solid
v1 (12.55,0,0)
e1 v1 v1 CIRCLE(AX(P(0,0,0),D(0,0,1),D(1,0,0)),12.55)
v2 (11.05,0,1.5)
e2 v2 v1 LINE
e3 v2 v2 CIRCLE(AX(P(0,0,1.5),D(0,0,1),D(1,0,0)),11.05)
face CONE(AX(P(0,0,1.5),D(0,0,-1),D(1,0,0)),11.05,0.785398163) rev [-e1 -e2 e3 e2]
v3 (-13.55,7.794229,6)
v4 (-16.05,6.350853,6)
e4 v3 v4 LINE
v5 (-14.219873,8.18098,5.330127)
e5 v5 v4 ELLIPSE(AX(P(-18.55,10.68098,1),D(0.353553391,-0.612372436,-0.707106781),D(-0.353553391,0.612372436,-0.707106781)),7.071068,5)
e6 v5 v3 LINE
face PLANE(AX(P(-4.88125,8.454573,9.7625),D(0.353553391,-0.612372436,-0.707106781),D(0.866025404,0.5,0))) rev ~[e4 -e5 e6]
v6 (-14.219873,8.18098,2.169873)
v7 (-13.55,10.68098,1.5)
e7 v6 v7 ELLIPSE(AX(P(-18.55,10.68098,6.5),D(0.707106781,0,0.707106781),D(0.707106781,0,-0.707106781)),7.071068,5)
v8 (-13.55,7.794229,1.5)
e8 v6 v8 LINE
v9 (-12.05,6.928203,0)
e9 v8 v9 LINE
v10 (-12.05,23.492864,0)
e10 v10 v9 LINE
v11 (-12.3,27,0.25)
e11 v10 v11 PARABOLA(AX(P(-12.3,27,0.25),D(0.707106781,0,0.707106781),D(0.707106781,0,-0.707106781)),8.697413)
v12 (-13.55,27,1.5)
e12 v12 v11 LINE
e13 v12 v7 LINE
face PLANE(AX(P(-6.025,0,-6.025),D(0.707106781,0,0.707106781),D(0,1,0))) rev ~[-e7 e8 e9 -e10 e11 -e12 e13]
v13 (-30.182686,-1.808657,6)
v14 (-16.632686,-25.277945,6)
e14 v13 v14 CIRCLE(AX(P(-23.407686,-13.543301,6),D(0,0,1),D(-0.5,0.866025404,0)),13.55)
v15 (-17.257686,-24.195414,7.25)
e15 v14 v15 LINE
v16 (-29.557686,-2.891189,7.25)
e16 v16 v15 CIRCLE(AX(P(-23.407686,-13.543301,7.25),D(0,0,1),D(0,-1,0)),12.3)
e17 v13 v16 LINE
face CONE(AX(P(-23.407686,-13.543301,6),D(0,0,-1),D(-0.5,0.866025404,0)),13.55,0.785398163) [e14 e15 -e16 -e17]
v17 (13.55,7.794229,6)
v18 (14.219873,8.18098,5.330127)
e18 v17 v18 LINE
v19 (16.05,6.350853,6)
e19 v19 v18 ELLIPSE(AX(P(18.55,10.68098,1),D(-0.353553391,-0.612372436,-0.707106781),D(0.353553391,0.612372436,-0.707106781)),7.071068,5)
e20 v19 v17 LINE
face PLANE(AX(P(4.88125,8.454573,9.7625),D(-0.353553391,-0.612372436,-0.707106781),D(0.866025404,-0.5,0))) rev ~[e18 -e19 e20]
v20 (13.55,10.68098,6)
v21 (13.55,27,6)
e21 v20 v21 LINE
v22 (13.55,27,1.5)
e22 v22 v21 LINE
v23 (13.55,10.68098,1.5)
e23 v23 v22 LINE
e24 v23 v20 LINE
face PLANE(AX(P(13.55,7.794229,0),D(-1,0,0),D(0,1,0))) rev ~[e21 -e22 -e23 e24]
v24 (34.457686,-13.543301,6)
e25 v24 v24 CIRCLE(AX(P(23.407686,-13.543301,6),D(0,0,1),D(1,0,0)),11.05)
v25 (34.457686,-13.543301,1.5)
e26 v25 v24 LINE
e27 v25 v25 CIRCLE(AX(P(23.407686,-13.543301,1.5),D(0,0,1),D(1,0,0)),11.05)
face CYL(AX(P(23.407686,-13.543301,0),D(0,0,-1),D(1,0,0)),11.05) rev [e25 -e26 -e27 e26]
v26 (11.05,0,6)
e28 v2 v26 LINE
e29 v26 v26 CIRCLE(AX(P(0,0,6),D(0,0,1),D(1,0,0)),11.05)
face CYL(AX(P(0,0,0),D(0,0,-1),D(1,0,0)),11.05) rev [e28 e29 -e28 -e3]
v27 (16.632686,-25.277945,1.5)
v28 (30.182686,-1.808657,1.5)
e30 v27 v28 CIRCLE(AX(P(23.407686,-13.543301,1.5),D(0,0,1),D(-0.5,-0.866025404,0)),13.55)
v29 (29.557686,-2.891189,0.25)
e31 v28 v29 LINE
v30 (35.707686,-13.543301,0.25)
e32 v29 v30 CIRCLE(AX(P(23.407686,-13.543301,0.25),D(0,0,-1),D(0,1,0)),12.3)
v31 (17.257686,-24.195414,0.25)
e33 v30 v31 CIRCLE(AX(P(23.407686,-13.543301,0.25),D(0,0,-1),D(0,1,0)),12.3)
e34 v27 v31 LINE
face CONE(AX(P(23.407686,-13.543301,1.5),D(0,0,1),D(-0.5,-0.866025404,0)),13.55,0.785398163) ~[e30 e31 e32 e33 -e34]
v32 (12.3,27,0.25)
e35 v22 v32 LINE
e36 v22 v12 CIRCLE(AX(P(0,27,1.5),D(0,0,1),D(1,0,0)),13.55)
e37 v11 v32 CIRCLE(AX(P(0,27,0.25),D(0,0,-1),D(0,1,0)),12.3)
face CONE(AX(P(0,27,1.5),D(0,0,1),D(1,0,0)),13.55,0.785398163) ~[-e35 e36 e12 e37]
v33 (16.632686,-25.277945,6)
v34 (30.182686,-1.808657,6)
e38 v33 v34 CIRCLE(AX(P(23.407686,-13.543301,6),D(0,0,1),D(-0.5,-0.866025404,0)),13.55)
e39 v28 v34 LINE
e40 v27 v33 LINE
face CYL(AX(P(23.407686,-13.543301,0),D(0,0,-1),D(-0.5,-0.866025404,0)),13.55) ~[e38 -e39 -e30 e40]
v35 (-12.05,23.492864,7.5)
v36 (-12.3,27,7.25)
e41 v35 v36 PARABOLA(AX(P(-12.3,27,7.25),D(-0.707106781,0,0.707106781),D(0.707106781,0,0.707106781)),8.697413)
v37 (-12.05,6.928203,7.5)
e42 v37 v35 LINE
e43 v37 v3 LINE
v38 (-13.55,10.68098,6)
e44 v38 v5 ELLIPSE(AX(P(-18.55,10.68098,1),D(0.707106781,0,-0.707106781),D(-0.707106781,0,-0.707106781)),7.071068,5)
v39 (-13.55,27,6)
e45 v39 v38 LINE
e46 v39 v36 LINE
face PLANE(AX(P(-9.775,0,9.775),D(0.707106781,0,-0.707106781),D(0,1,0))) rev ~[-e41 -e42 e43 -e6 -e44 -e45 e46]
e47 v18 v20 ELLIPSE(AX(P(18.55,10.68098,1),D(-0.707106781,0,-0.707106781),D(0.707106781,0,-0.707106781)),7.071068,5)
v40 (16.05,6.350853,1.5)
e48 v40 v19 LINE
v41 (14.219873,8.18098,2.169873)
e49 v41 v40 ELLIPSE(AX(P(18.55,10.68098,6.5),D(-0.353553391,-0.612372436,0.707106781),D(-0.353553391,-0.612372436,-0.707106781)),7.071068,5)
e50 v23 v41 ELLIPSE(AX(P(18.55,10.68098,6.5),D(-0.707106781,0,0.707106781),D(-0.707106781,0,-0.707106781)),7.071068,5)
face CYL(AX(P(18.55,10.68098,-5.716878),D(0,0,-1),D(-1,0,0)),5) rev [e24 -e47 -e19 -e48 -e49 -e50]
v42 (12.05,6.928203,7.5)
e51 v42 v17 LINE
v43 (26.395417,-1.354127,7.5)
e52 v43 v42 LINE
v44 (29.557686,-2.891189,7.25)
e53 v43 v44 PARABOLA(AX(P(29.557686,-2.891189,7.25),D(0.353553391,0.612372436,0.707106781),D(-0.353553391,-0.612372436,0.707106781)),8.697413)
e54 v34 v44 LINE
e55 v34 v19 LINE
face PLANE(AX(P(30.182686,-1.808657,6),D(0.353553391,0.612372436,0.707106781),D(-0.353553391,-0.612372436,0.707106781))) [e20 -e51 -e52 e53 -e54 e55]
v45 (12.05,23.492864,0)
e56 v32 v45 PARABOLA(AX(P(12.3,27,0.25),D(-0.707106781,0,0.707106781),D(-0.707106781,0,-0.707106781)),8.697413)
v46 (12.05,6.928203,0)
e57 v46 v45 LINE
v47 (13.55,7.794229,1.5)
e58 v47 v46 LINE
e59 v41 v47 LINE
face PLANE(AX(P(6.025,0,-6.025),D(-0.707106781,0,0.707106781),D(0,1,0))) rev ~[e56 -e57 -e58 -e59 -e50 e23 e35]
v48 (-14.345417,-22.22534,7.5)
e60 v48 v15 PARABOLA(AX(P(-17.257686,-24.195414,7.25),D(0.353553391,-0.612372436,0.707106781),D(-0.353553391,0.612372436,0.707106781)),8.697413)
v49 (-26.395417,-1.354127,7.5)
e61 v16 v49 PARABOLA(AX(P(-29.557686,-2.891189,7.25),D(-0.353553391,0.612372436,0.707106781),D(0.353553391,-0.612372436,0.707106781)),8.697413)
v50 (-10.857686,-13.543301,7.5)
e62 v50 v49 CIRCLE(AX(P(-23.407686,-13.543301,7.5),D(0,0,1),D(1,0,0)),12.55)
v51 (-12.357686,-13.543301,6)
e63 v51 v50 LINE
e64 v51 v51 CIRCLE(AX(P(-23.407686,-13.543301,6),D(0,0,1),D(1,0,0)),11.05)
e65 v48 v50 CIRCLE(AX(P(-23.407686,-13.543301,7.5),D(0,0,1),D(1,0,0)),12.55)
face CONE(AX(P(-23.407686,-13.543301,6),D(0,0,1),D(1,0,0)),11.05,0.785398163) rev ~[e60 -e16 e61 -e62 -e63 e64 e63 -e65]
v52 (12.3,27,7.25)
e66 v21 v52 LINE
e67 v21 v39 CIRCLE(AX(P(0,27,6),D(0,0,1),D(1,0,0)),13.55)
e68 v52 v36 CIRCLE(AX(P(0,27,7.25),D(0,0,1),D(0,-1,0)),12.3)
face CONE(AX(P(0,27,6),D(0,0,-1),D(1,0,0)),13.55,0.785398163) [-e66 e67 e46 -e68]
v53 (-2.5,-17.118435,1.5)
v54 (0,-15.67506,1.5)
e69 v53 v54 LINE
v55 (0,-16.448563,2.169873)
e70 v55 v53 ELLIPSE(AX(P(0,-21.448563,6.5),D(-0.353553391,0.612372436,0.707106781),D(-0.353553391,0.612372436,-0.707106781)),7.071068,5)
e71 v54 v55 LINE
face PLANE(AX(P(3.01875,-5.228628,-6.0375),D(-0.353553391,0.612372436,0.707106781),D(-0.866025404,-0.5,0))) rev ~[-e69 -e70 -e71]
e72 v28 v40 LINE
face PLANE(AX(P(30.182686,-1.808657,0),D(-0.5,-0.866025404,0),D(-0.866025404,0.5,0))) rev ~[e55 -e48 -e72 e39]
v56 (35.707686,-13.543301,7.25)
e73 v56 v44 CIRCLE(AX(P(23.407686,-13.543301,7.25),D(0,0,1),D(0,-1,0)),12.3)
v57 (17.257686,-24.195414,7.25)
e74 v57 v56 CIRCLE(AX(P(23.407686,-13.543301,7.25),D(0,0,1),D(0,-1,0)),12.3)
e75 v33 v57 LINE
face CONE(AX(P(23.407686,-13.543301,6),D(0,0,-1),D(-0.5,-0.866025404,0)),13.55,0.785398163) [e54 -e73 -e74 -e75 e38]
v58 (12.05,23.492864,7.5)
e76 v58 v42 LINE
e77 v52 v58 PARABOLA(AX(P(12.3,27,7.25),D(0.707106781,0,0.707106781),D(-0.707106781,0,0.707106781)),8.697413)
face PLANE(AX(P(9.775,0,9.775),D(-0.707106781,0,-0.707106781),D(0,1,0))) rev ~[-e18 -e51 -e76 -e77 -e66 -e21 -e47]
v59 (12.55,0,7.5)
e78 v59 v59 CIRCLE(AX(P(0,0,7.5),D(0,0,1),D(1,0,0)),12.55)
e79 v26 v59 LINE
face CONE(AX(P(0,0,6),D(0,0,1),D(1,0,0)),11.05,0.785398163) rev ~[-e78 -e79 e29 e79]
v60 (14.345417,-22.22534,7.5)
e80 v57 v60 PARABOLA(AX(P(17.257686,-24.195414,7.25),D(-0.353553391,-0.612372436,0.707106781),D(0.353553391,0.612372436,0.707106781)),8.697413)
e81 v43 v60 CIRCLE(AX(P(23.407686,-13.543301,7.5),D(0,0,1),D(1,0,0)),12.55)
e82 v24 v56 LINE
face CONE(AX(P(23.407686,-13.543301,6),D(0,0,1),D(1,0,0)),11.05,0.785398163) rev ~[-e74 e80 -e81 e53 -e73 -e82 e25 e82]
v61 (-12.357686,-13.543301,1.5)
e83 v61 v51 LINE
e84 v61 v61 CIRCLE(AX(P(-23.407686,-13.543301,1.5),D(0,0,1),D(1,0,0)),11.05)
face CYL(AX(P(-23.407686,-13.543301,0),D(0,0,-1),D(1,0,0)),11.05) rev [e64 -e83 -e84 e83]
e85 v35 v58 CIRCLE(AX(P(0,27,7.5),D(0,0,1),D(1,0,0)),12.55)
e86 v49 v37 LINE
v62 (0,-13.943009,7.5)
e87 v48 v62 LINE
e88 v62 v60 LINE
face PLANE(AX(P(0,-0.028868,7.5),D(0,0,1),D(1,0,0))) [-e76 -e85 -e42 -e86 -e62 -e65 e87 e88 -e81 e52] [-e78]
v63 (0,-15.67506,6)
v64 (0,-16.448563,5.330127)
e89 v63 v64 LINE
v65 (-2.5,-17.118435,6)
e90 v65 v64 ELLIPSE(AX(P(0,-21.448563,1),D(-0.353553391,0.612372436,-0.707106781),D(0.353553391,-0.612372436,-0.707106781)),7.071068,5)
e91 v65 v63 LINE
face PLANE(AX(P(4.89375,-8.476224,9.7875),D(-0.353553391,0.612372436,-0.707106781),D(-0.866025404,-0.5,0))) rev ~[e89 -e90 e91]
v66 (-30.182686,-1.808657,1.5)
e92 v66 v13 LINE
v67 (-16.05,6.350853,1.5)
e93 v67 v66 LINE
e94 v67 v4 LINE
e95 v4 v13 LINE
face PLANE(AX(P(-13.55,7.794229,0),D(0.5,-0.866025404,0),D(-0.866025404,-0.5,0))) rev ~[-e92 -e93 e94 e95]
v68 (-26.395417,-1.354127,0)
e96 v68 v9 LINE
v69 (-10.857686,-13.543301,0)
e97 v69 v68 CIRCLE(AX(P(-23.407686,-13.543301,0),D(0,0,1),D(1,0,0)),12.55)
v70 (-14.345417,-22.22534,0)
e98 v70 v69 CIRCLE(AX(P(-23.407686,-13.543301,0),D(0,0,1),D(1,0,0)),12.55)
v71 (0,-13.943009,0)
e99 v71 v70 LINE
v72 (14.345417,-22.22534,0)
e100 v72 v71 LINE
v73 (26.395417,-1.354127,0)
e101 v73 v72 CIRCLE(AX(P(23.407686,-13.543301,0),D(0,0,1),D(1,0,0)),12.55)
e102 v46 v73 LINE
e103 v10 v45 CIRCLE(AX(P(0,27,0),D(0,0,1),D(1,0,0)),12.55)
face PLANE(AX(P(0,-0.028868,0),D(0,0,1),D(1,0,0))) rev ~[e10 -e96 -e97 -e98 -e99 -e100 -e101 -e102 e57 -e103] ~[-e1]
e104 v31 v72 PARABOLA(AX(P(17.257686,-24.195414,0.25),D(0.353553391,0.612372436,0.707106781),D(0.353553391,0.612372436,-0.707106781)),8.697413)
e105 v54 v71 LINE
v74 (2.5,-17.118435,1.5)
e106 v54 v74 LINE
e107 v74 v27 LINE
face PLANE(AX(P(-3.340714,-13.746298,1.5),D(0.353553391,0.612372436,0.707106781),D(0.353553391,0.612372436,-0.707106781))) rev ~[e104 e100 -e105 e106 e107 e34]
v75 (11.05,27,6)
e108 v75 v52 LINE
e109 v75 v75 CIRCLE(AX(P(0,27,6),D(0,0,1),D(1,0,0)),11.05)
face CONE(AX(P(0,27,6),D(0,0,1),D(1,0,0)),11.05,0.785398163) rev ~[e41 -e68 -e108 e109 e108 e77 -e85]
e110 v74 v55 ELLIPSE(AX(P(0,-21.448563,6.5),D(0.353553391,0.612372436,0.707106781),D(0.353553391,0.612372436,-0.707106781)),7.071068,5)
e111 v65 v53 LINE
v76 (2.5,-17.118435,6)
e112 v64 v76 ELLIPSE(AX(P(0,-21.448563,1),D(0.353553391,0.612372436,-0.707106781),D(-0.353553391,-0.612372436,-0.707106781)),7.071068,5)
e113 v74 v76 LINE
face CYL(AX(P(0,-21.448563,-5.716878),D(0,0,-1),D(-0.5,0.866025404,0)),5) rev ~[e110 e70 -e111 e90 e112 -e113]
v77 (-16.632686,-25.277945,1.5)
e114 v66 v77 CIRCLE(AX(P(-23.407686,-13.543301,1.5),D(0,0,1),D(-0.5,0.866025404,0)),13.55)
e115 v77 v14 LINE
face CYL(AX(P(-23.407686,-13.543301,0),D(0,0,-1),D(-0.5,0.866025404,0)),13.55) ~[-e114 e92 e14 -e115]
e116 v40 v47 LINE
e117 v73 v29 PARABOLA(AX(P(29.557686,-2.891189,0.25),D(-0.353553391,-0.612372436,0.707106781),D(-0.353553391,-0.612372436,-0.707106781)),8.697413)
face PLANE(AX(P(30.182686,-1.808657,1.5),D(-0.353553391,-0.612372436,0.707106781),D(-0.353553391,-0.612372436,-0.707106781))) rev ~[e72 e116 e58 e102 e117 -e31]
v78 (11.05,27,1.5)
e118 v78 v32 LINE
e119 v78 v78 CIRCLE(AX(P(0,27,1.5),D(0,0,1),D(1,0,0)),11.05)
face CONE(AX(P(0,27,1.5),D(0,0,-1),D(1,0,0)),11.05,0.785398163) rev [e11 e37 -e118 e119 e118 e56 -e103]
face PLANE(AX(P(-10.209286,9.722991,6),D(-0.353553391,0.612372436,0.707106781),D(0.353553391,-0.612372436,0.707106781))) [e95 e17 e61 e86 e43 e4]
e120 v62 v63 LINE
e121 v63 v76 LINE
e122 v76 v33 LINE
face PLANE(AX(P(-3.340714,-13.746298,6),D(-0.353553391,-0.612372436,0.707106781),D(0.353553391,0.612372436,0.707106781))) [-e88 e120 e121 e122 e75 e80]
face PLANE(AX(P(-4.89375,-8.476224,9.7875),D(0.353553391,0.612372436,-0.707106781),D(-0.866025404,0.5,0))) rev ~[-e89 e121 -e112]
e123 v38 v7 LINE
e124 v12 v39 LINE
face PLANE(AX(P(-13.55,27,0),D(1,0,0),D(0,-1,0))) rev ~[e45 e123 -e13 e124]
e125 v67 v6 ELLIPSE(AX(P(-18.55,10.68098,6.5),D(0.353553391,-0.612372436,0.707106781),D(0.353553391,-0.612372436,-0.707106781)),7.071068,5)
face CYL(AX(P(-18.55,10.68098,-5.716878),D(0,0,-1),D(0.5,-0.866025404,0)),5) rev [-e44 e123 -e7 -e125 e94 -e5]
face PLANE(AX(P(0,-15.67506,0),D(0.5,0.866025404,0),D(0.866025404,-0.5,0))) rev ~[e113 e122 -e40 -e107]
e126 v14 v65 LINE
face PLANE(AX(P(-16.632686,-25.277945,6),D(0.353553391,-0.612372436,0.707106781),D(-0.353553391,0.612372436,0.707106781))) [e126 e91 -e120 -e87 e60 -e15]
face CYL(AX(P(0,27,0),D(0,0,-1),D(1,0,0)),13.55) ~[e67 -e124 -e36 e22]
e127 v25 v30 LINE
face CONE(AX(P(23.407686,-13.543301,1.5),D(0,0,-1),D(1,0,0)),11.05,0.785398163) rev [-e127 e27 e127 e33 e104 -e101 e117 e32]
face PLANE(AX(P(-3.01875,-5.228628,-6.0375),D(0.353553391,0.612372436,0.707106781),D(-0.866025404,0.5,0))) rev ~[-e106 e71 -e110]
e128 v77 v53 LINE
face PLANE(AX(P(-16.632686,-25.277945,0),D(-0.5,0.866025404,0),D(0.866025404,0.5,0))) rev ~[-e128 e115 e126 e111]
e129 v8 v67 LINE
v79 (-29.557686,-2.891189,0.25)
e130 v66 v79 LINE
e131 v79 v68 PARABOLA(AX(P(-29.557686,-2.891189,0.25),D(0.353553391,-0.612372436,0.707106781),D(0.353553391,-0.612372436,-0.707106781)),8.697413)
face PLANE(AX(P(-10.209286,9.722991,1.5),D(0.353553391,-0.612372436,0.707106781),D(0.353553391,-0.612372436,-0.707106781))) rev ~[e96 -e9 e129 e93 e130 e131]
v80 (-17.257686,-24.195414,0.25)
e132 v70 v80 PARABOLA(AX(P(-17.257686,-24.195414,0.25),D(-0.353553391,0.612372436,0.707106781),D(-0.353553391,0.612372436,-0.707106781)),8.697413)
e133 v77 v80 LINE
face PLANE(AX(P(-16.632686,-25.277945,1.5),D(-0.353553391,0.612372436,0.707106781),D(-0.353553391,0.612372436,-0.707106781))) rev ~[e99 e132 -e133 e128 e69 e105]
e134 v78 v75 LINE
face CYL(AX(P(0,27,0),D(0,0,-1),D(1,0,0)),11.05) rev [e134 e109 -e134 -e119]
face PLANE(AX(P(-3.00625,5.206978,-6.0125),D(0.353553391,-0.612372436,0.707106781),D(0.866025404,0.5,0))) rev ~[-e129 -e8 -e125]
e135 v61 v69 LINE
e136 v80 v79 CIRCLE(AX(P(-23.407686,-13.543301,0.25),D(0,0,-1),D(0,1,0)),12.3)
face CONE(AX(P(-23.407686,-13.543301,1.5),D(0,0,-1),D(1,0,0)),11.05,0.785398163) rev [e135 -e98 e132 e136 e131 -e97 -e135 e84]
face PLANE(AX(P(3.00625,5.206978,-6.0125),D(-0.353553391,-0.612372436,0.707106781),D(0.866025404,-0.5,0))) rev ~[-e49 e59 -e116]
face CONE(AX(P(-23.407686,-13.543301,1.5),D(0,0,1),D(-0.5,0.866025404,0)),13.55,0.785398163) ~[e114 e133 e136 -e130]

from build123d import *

# Parameters (mm, degrees)
F0_R          = 11.05
F1_DEPTH      = 7.5
F2_T4_DEPTH   = 23.0632958479
F2_T9_DEPTH   = 23.0632958479
F2_T14_DEPTH  = 23.0632958479
F2_T27_DEPTH  = 23.0632958479
F2_T32_DEPTH  = 23.0632958479
F2_T37_DEPTH  = 23.0632958479
F2_T50_DEPTH  = 23.0632958479
F2_T55_DEPTH  = 23.0632958479
F2_T60_DEPTH  = 23.0632958479
F2_T65_DEPTH  = 23.0632958479
F2_T70_DEPTH  = 23.0632958479
F2_T75_DEPTH  = 23.0632958479
F2_T78_ANGLE  = 180
F2_T80_ANGLE  = 180
F2_T82_ANGLE  = 180
F2_T84_ANGLE  = 180
F2_T86_ANGLE  = 180
F2_T88_ANGLE  = 180
F2_T93_DEPTH  = 23.0632958479
F2_T97_DEPTH  = 23.0632958479
F2_T104_DEPTH = 23.0632958479
F2_T108_DEPTH = 23.0632958479
F2_T115_DEPTH = 23.0632958479
F2_T119_DEPTH = 23.0632958479
F2_T126_DEPTH = 23.0632958479
F2_T130_DEPTH = 23.0632958479
F2_T137_DEPTH = 23.0632958479
F2_T141_DEPTH = 23.0632958479
F2_T148_DEPTH = 23.0632958479
F2_T152_DEPTH = 23.0632958479
F3_T4_DEPTH   = 18.9337567297
F3_T10_DEPTH  = 18.9337567297
F3_T16_DEPTH  = 18.9337567297
F3_T22_DEPTH  = 18.9337567297
F3_T28_DEPTH  = 18.9337567297
F3_T34_DEPTH  = 18.9337567297
F3_T40_DEPTH  = 18.9337567297
F3_T46_DEPTH  = 18.9337567297
F3_T52_DEPTH  = 18.9337567297
F3_T58_DEPTH  = 18.9337567297


# Not quite as in the source:
# - a fillet or chamfer that OpenCascade refuses, or shapes differently, is made with other operations: its cross-section is extruded or revolved along the edge and cut away or added


with BuildPart() as f1:
    # F0 (on Top) → F1 (new body)
    with BuildSketch(Plane.XY):
        with BuildLine():
            ThreePointArc((13.55, 27), (0, 40.55), (-13.55, 27))
            Line((-13.55, 27), (-13.55, 7.7942286341))
            Line((-13.55, 7.7942286341), (-30.1826859022, -1.8086570489))
            ThreePointArc((-30.1826859022, -1.8086570489), (-35.1423301235, -20.3183012702), (-16.6326859022, -25.2779454915))
            Line((-16.6326859022, -25.2779454915), (0, -15.6750598085))
            Line((0, -15.6750598085), (16.6326859022, -25.2779454915))
            ThreePointArc((16.6326859022, -25.2779454915), (35.1423301235, -20.3183012702), (30.1826859022, -1.8086570489))
            Line((30.1826859022, -1.8086570489), (13.55, 7.7942286341))
            Line((13.55, 7.7942286341), (13.55, 27))
        make_face()
        with Locations((-23.4076859022, -13.5433012702)):
            Circle(F0_R, mode=Mode.SUBTRACT)
        with Locations((23.4076859022, -13.5433012702)):
            Circle(F0_R, mode=Mode.SUBTRACT)
        Circle(F0_R, mode=Mode.SUBTRACT)
        with Locations((0, 27)):
            Circle(F0_R, mode=Mode.SUBTRACT)
    extrude(amount=F1_DEPTH)

    # F2: chamfer of 1.5 on 20 edges, made by hand


with BuildPart() as f2_tool2:
    # F2_s3 → F2_t4 (new body)
    with BuildSketch(Plane(origin=(-23.4201859022, -13.5216506351, 0), x_dir=(0, 0, 1), z_dir=(0.8660254038, 0.5, 0))):
        Polygon((6, 13.575), (7.5, 12.075), (7.5, 13.575), align=None)
    extrude(amount=F2_T4_DEPTH)

    split(bisect_by=Plane(origin=(-6.7875, -11.7562948564, 0), x_dir=(0, 0, 1), z_dir=(-0.5, -0.8660254038, 0)), keep=Keep.TOP)


with BuildPart() as f1_1:
    add(f1.part)

    # F2_t1: cut F2_tool2
    add(f2_tool2.part, mode=Mode.SUBTRACT)


with BuildPart() as f2_tool7:
    # F2_s8 → F2_t9 (new body)
    with BuildSketch(Plane.XZ.offset(-27)):
        Polygon((-13.55, 6), (-12.05, 7.5), (-13.55, 7.5), align=None)
    extrude(amount=F2_T9_DEPTH)

    split(bisect_by=Plane(origin=(-6.7625, 11.7129935862, 0), x_dir=(0, 0, 1), z_dir=(-0.5, 0.8660254038, 0)), keep=Keep.TOP)


with BuildPart() as f1_2:
    add(f1_1.part)

    # F2_t6: cut F2_tool7
    add(f2_tool7.part, mode=Mode.SUBTRACT)


with BuildPart() as f2_tool12:
    # F2_s13 → F2_t14 (new body)
    with BuildSketch(Plane(origin=(3.4467858029, -1.9900027112, 0), x_dir=(0, 0, 1), z_dir=(0.8660254038, -0.5, 0))):
        Polygon((6, 13.575), (7.5, 12.075), (7.5, 13.575), align=None)
    extrude(amount=F2_T14_DEPTH)

    split(bisect_by=Plane(origin=(6.7875, -11.7562948564, 0), x_dir=(0, 0, 1), z_dir=(0.5, -0.8660254038, 0)), keep=Keep.TOP)


with BuildPart() as f1_3:
    add(f1_2.part)

    # F2_t11: cut F2_tool12
    add(f2_tool12.part, mode=Mode.SUBTRACT)

    # F2_s16 → F2_t17 (revolve, cut)
    with BuildSketch(Plane.XZ.offset(13.5433012702)):
        Polygon((-12.3576859022, 6), (-10.8576859022, 7.5), (-12.3576859022, 7.5), align=None)
    revolve(axis=Axis((-23.4076859022, -13.5433012702, 7.5), (0, 0, 1)), mode=Mode.SUBTRACT)

    # F2_s18 → F2_t19 (revolve, cut)
    with BuildSketch(Plane.XZ):
        Polygon((11.05, 6), (12.55, 7.5), (11.05, 7.5), align=None)
    revolve(axis=Axis((0, 0, 7.5), (0, 0, 1)), mode=Mode.SUBTRACT)

    # F2_s20 → F2_t21 (revolve, cut)
    with BuildSketch(Plane.XZ.offset(-27)):
        Polygon((11.05, 6), (12.55, 7.5), (11.05, 7.5), align=None)
    revolve(axis=Axis((0, 27, 7.5), (0, 0, 1)), mode=Mode.SUBTRACT)

    # F2_s22 → F2_t23 (revolve, cut)
    with BuildSketch(Plane.XZ.offset(13.5433012702)):
        Polygon((34.4576859022, 6), (35.9576859022, 7.5), (34.4576859022, 7.5), align=None)
    revolve(axis=Axis((23.4076859022, -13.5433012702, 7.5), (0, 0, 1)), mode=Mode.SUBTRACT)


with BuildPart() as f2_tool25:
    # F2_s26 → F2_t27 (new body)
    with BuildSketch(Plane.XZ.offset(-27)):
        Polygon((-13.55, 1.5), (-12.05, 0), (-13.55, 0), align=None)
    extrude(amount=F2_T27_DEPTH)

    split(bisect_by=Plane(origin=(-6.7625, 11.7129935862, 0), x_dir=(0, 0, 1), z_dir=(-0.5, 0.8660254038, 0)), keep=Keep.TOP)


with BuildPart() as f1_4:
    add(f1_3.part)

    # F2_t24: cut F2_tool25
    add(f2_tool25.part, mode=Mode.SUBTRACT)


with BuildPart() as f2_tool30:
    # F2_s31 → F2_t32 (new body)
    with BuildSketch(Plane(origin=(-3.4467858029, -1.9900027112, 0), x_dir=(0, 0, 1), z_dir=(-0.8660254038, -0.5, 0))):
        Polygon((1.5, 13.525), (0, 12.025), (0, 13.525), align=None)
    extrude(amount=F2_T32_DEPTH)

    split(bisect_by=Plane.YZ.offset(-13.55), keep=Keep.BOTTOM)


with BuildPart() as f1_5:
    add(f1_4.part)

    # F2_t29: cut F2_tool30
    add(f2_tool30.part, mode=Mode.SUBTRACT)


with BuildPart() as f2_tool35:
    # F2_s36 → F2_t37 (new body)
    with BuildSketch(Plane(origin=(3.4467858029, -1.9900027112, 0), x_dir=(0, 0, 1), z_dir=(0.8660254038, -0.5, 0))):
        Polygon((1.5, 13.575), (0, 12.075), (0, 13.575), align=None)
    extrude(amount=F2_T37_DEPTH)

    split(bisect_by=Plane(origin=(6.7875, -11.7562948564, 0), x_dir=(0, 0, 1), z_dir=(0.5, -0.8660254038, 0)), keep=Keep.TOP)


with BuildPart() as f1_6:
    add(f1_5.part)

    # F2_t34: cut F2_tool35
    add(f2_tool35.part, mode=Mode.SUBTRACT)

    # F2_s39 → F2_t40 (revolve, cut)
    with BuildSketch(Plane.XZ.offset(13.5433012702)):
        Polygon((34.4576859022, 1.5), (35.9576859022, 0), (34.4576859022, 0), align=None)
    revolve(axis=Axis((23.4076859022, -13.5433012702, 0), (0, 0, 1)), mode=Mode.SUBTRACT)

    # F2_s41 → F2_t42 (revolve, cut)
    with BuildSketch(Plane.XZ):
        Polygon((11.05, 1.5), (12.55, 0), (11.05, 0), align=None)
    revolve(axis=Axis((0, 0, 0), (0, 0, 1)), mode=Mode.SUBTRACT)

    # F2_s43 → F2_t44 (revolve, cut)
    with BuildSketch(Plane.XZ.offset(13.5433012702)):
        Polygon((-12.3576859022, 1.5), (-10.8576859022, 0), (-12.3576859022, 0), align=None)
    revolve(axis=Axis((-23.4076859022, -13.5433012702, 0), (0, 0, 1)), mode=Mode.SUBTRACT)

    # F2_s45 → F2_t46 (revolve, cut)
    with BuildSketch(Plane.XZ.offset(-27)):
        Polygon((11.05, 1.5), (12.55, 0), (11.05, 0), align=None)
    revolve(axis=Axis((0, 27, 0), (0, 0, 1)), mode=Mode.SUBTRACT)


with BuildPart() as f2_tool48:
    # F2_s49 → F2_t50 (new body)
    with BuildSketch(Plane(origin=(-23.4201859022, -13.5216506351, 0), x_dir=(0, 0, 1), z_dir=(0.8660254038, 0.5, 0))):
        Polygon((1.5, 13.575), (0, 12.075), (0, 13.575), align=None)
    extrude(amount=F2_T50_DEPTH)

    split(bisect_by=Plane(origin=(-6.7875, -11.7562948564, 0), x_dir=(0, 0, 1), z_dir=(-0.5, -0.8660254038, 0)), keep=Keep.TOP)


with BuildPart() as f1_7:
    add(f1_6.part)

    # F2_t47: cut F2_tool48
    add(f2_tool48.part, mode=Mode.SUBTRACT)


with BuildPart() as f2_tool53:
    # F2_s54 → F2_t55 (new body)
    with BuildSketch(Plane(origin=(23.4201859022, -13.5216506351, 0), x_dir=(0, 0, 1), z_dir=(-0.8660254038, 0.5, 0))):
        Polygon((1.5, 13.525), (0, 12.025), (0, 13.525), align=None)
    extrude(amount=F2_T55_DEPTH)

    split(bisect_by=Plane.YZ.offset(13.55), keep=Keep.TOP)


with BuildPart() as f1_8:
    add(f1_7.part)

    # F2_t52: cut F2_tool53
    add(f2_tool53.part, mode=Mode.SUBTRACT)


with BuildPart() as f2_tool58:
    # F2_s59 → F2_t60 (new body)
    with BuildSketch(Plane(origin=(23.4201859022, -13.5216506351, 0), x_dir=(0, 0, 1), z_dir=(-0.8660254038, 0.5, 0))):
        Polygon((6, 13.525), (7.5, 12.025), (7.5, 13.525), align=None)
    extrude(amount=F2_T60_DEPTH)

    split(bisect_by=Plane.YZ.offset(13.55), keep=Keep.TOP)


with BuildPart() as f1_9:
    add(f1_8.part)

    # F2_t57: cut F2_tool58
    add(f2_tool58.part, mode=Mode.SUBTRACT)


with BuildPart() as f2_tool63:
    # F2_s64 → F2_t65 (new body)
    with BuildSketch(Plane.XZ.offset(-3.9367041521)):
        Polygon((13.55, 1.5), (12.05, 0), (13.55, 0), align=None)
    extrude(amount=-F2_T65_DEPTH)

    split(bisect_by=Plane(origin=(6.7625, 11.7129935862, 0), x_dir=(0, 0, 1), z_dir=(0.5, 0.8660254038, 0)), keep=Keep.TOP)


with BuildPart() as f1_10:
    add(f1_9.part)

    # F2_t62: cut F2_tool63
    add(f2_tool63.part, mode=Mode.SUBTRACT)


with BuildPart() as f2_tool68:
    # F2_s69 → F2_t70 (new body)
    with BuildSketch(Plane.XZ.offset(-3.9367041521)):
        Polygon((13.55, 6), (12.05, 7.5), (13.55, 7.5), align=None)
    extrude(amount=-F2_T70_DEPTH)

    split(bisect_by=Plane(origin=(6.7625, 11.7129935862, 0), x_dir=(0, 0, 1), z_dir=(0.5, 0.8660254038, 0)), keep=Keep.TOP)


with BuildPart() as f1_11:
    add(f1_10.part)

    # F2_t67: cut F2_tool68
    add(f2_tool68.part, mode=Mode.SUBTRACT)


with BuildPart() as f2_tool73:
    # F2_s74 → F2_t75 (new body)
    with BuildSketch(Plane(origin=(-3.4467858029, -1.9900027112, 0), x_dir=(0, 0, 1), z_dir=(-0.8660254038, -0.5, 0))):
        Polygon((6, 13.525), (7.5, 12.025), (7.5, 13.525), align=None)
    extrude(amount=F2_T75_DEPTH)

    split(bisect_by=Plane.YZ.offset(-13.55), keep=Keep.BOTTOM)


with BuildPart() as f1_12:
    add(f1_11.part)

    # F2_t72: cut F2_tool73
    add(f2_tool73.part, mode=Mode.SUBTRACT)

    # F2_s77 → F2_t78 (revolve, cut)
    with BuildSketch(Plane(origin=(-23.4201859022, -13.5216506351, 0), x_dir=(0, 0, 1), z_dir=(0.8660254038, 0.5, 0))):
        Polygon((6, -13.525), (7.5, -12.025), (7.5, -13.525), align=None)
    revolve(axis=Axis((-23.4076859022, -13.5433012702, 7.5), (0, 0, 1)), revolution_arc=F2_T78_ANGLE, mode=Mode.SUBTRACT)

    # F2_s79 → F2_t80 (revolve, cut)
    with BuildSketch(Plane.XZ.offset(-27)):
        Polygon((13.55, 6), (12.05, 7.5), (13.55, 7.5), align=None)
    revolve(axis=Axis((0, 27, 7.5), (0, 0, 1)), revolution_arc=F2_T80_ANGLE, mode=Mode.SUBTRACT)

    # F2_s81 → F2_t82 (revolve, cut)
    with BuildSketch(Plane.XZ.offset(-27)):
        Polygon((13.55, 1.5), (12.05, 0), (13.55, 0), align=None)
    revolve(axis=Axis((0, 27, 0), (0, 0, 1)), revolution_arc=F2_T82_ANGLE, mode=Mode.SUBTRACT)

    # F2_s83 → F2_t84 (revolve, cut)
    with BuildSketch(Plane(origin=(23.4201859022, -13.5216506351, 0), x_dir=(0, 0, 1), z_dir=(-0.8660254038, 0.5, 0))):
        Polygon((6, -13.575), (7.5, -12.075), (7.5, -13.575), align=None)
    revolve(axis=Axis((23.4076859022, -13.5433012702, 7.5), (0, 0, 1)), revolution_arc=F2_T84_ANGLE, mode=Mode.SUBTRACT)

    # F2_s85 → F2_t86 (revolve, cut)
    with BuildSketch(Plane(origin=(23.4201859022, -13.5216506351, 0), x_dir=(0, 0, 1), z_dir=(-0.8660254038, 0.5, 0))):
        Polygon((1.5, -13.575), (0, -12.075), (0, -13.575), align=None)
    revolve(axis=Axis((23.4076859022, -13.5433012702, 0), (0, 0, 1)), revolution_arc=F2_T86_ANGLE, mode=Mode.SUBTRACT)

    # F2_s87 → F2_t88 (revolve, cut)
    with BuildSketch(Plane(origin=(-23.4201859022, -13.5216506351, 0), x_dir=(0, 0, 1), z_dir=(0.8660254038, 0.5, 0))):
        Polygon((1.5, -13.525), (0, -12.025), (0, -13.525), align=None)
    revolve(axis=Axis((-23.4076859022, -13.5433012702, 0), (0, 0, 1)), revolution_arc=F2_T88_ANGLE, mode=Mode.SUBTRACT)


with BuildPart() as f2_tool91:
    # F2_s92 → F2_t93 (new body)
    with BuildSketch(Plane(origin=(-23.4201859022, -13.5216506351, 0), x_dir=(0, 0, 1), z_dir=(0.8660254038, 0.5, 0))):
        Polygon((6, 13.575), (7.5, 12.075), (7.5, 13.575), align=None)
    extrude(amount=F2_T93_DEPTH)

    split(bisect_by=Plane(origin=(-6.7875, -11.7562948564, 0), x_dir=(0, 0, 1), z_dir=(0.5, 0.8660254038, 0)), keep=Keep.TOP)


with BuildPart() as f2_tool95:
    # F2_s96 → F2_t97 (new body)
    with BuildSketch(Plane(origin=(3.4467858029, -1.9900027112, 0), x_dir=(0, 0, 1), z_dir=(0.8660254038, -0.5, 0))):
        Polygon((6, 13.575), (7.5, 12.075), (7.5, 13.575), align=None)
    extrude(amount=F2_T97_DEPTH)

    split(bisect_by=Plane(origin=(6.7875, -11.7562948564, 0), x_dir=(0, 0, 1), z_dir=(-0.5, 0.8660254038, 0)), keep=Keep.TOP)


with BuildPart() as f2_tool91_1:
    add(f2_tool91.part)

    # F2_t99: intersect F2_tool95
    add(f2_tool95.part, mode=Mode.INTERSECT)


with BuildPart() as f1_13:
    add(f1_12.part)

    # F2_t89: cut F2_tool91
    add(f2_tool91_1.part, mode=Mode.SUBTRACT)


with BuildPart() as f2_tool102:
    # F2_s103 → F2_t104 (new body)
    with BuildSketch(Plane.XZ.offset(-27)):
        Polygon((-13.55, 6), (-12.05, 7.5), (-13.55, 7.5), align=None)
    extrude(amount=F2_T104_DEPTH)

    split(bisect_by=Plane(origin=(-6.7625, 11.7129935862, 0), x_dir=(0, 0, 1), z_dir=(0.5, -0.8660254038, 0)), keep=Keep.TOP)


with BuildPart() as f2_tool106:
    # F2_s107 → F2_t108 (new body)
    with BuildSketch(Plane(origin=(-3.4467858029, -1.9900027112, 0), x_dir=(0, 0, 1), z_dir=(-0.8660254038, -0.5, 0))):
        Polygon((6, 13.525), (7.5, 12.025), (7.5, 13.525), align=None)
    extrude(amount=F2_T108_DEPTH)

    split(bisect_by=Plane.YZ.offset(-13.55), keep=Keep.TOP)


with BuildPart() as f2_tool102_1:
    add(f2_tool102.part)

    # F2_t110: intersect F2_tool106
    add(f2_tool106.part, mode=Mode.INTERSECT)


with BuildPart() as f1_14:
    add(f1_13.part)

    # F2_t100: cut F2_tool102
    add(f2_tool102_1.part, mode=Mode.SUBTRACT)


with BuildPart() as f2_tool113:
    # F2_s114 → F2_t115 (new body)
    with BuildSketch(Plane.XZ.offset(-27)):
        Polygon((-13.55, 1.5), (-12.05, 0), (-13.55, 0), align=None)
    extrude(amount=F2_T115_DEPTH)

    split(bisect_by=Plane(origin=(-6.7625, 11.7129935862, 0), x_dir=(0, 0, 1), z_dir=(0.5, -0.8660254038, 0)), keep=Keep.TOP)


with BuildPart() as f2_tool117:
    # F2_s118 → F2_t119 (new body)
    with BuildSketch(Plane(origin=(-3.4467858029, -1.9900027112, 0), x_dir=(0, 0, 1), z_dir=(-0.8660254038, -0.5, 0))):
        Polygon((1.5, 13.525), (0, 12.025), (0, 13.525), align=None)
    extrude(amount=F2_T119_DEPTH)

    split(bisect_by=Plane.YZ.offset(-13.55), keep=Keep.TOP)


with BuildPart() as f2_tool113_1:
    add(f2_tool113.part)

    # F2_t121: intersect F2_tool117
    add(f2_tool117.part, mode=Mode.INTERSECT)


with BuildPart() as f1_15:
    add(f1_14.part)

    # F2_t111: cut F2_tool113
    add(f2_tool113_1.part, mode=Mode.SUBTRACT)


with BuildPart() as f2_tool124:
    # F2_s125 → F2_t126 (new body)
    with BuildSketch(Plane(origin=(-23.4201859022, -13.5216506351, 0), x_dir=(0, 0, 1), z_dir=(0.8660254038, 0.5, 0))):
        Polygon((1.5, 13.575), (0, 12.075), (0, 13.575), align=None)
    extrude(amount=F2_T126_DEPTH)

    split(bisect_by=Plane(origin=(-6.7875, -11.7562948564, 0), x_dir=(0, 0, 1), z_dir=(0.5, 0.8660254038, 0)), keep=Keep.TOP)


with BuildPart() as f2_tool128:
    # F2_s129 → F2_t130 (new body)
    with BuildSketch(Plane(origin=(3.4467858029, -1.9900027112, 0), x_dir=(0, 0, 1), z_dir=(0.8660254038, -0.5, 0))):
        Polygon((1.5, 13.575), (0, 12.075), (0, 13.575), align=None)
    extrude(amount=F2_T130_DEPTH)

    split(bisect_by=Plane(origin=(6.7875, -11.7562948564, 0), x_dir=(0, 0, 1), z_dir=(-0.5, 0.8660254038, 0)), keep=Keep.TOP)


with BuildPart() as f2_tool124_1:
    add(f2_tool124.part)

    # F2_t132: intersect F2_tool128
    add(f2_tool128.part, mode=Mode.INTERSECT)


with BuildPart() as f1_16:
    add(f1_15.part)

    # F2_t122: cut F2_tool124
    add(f2_tool124_1.part, mode=Mode.SUBTRACT)


with BuildPart() as f2_tool135:
    # F2_s136 → F2_t137 (new body)
    with BuildSketch(Plane(origin=(23.4201859022, -13.5216506351, 0), x_dir=(0, 0, 1), z_dir=(-0.8660254038, 0.5, 0))):
        Polygon((1.5, 13.525), (0, 12.025), (0, 13.525), align=None)
    extrude(amount=F2_T137_DEPTH)

    split(bisect_by=Plane.YZ.offset(13.55), keep=Keep.BOTTOM)


with BuildPart() as f2_tool139:
    # F2_s140 → F2_t141 (new body)
    with BuildSketch(Plane.XZ.offset(-3.9367041521)):
        Polygon((13.55, 1.5), (12.05, 0), (13.55, 0), align=None)
    extrude(amount=-F2_T141_DEPTH)

    split(bisect_by=Plane(origin=(6.7625, 11.7129935862, 0), x_dir=(0, 0, 1), z_dir=(-0.5, -0.8660254038, 0)), keep=Keep.TOP)


with BuildPart() as f2_tool135_1:
    add(f2_tool135.part)

    # F2_t143: intersect F2_tool139
    add(f2_tool139.part, mode=Mode.INTERSECT)


with BuildPart() as f1_17:
    add(f1_16.part)

    # F2_t133: cut F2_tool135
    add(f2_tool135_1.part, mode=Mode.SUBTRACT)


with BuildPart() as f2_tool146:
    # F2_s147 → F2_t148 (new body)
    with BuildSketch(Plane(origin=(23.4201859022, -13.5216506351, 0), x_dir=(0, 0, 1), z_dir=(-0.8660254038, 0.5, 0))):
        Polygon((6, 13.525), (7.5, 12.025), (7.5, 13.525), align=None)
    extrude(amount=F2_T148_DEPTH)

    split(bisect_by=Plane.YZ.offset(13.55), keep=Keep.BOTTOM)


with BuildPart() as f2_tool150:
    # F2_s151 → F2_t152 (new body)
    with BuildSketch(Plane.XZ.offset(-3.9367041521)):
        Polygon((13.55, 6), (12.05, 7.5), (13.55, 7.5), align=None)
    extrude(amount=-F2_T152_DEPTH)

    split(bisect_by=Plane(origin=(6.7625, 11.7129935862, 0), x_dir=(0, 0, 1), z_dir=(-0.5, -0.8660254038, 0)), keep=Keep.TOP)


with BuildPart() as f2_tool146_1:
    add(f2_tool146.part)

    # F2_t154: intersect F2_tool150
    add(f2_tool150.part, mode=Mode.INTERSECT)


with BuildPart() as f1_18:
    add(f1_17.part)

    # F2_t144: cut F2_tool146
    add(f2_tool146_1.part, mode=Mode.SUBTRACT)

    # F3: fillet of radius 5 on 3 edges, made by hand


with BuildPart() as f3_tool2:
    # F3_s3 → F3_t4 (new body)
    with BuildSketch(Plane.XY.offset(-5.7168783649)):
        with BuildLine():
            ThreePointArc((-16.05, 6.3508529611), (-14.2198729811, 8.18097998), (-13.55, 10.68097998))
            Line((-13.55, 10.68097998), (-13.55, 7.7942286341))
            Line((-13.55, 7.7942286341), (-16.05, 6.3508529611))
        make_face()
    extrude(amount=F3_T4_DEPTH)

    split(bisect_by=Plane(origin=(-6.025, 0, -6.025), x_dir=(0, 1, 0), z_dir=(0.7071067812, 0, 0.7071067812)), keep=Keep.TOP)

    split(bisect_by=Plane(origin=(-4.88125, 8.4545730044, 9.7625), x_dir=(0.8660254038, 0.5, 0), z_dir=(0.3535533906, -0.6123724357, -0.7071067812)), keep=Keep.TOP)


with BuildPart() as f1_19:
    add(f1_18.part)

    # F3_t1: union F3_tool2
    add(f3_tool2.part)


with BuildPart() as f3_tool8:
    # F3_s9 → F3_t10 (new body)
    with BuildSketch(Plane.XY.offset(-5.7168783649)):
        with BuildLine():
            ThreePointArc((-16.05, 6.3508529611), (-14.2198729811, 8.18097998), (-13.55, 10.68097998))
            Line((-13.55, 10.68097998), (-13.55, 7.7942286341))
            Line((-13.55, 7.7942286341), (-16.05, 6.3508529611))
        make_face()
    extrude(amount=F3_T10_DEPTH)

    split(bisect_by=Plane(origin=(-9.775, 0, 9.775), x_dir=(0, 1, 0), z_dir=(0.7071067812, 0, -0.7071067812)), keep=Keep.TOP)

    split(bisect_by=Plane(origin=(-3.00625, 5.2069777403, -6.0125), x_dir=(0.8660254038, 0.5, 0), z_dir=(0.3535533906, -0.6123724357, 0.7071067812)), keep=Keep.TOP)


with BuildPart() as f1_20:
    add(f1_19.part)

    # F3_t7: union F3_tool8
    add(f3_tool8.part)


with BuildPart() as f3_tool14:
    # F3_s15 → F3_t16 (new body)
    with BuildSketch(Plane.XY.offset(-5.7168783649)):
        with BuildLine():
            ThreePointArc((-16.05, 6.3508529611), (-14.2198729811, 8.18097998), (-13.55, 10.68097998))
            Line((-13.55, 10.68097998), (-13.55, 7.7942286341))
            Line((-13.55, 7.7942286341), (-16.05, 6.3508529611))
        make_face()
    extrude(amount=F3_T16_DEPTH)

    split(bisect_by=Plane(origin=(-3.00625, 5.2069777403, -6.0125), x_dir=(-0.8660254038, -0.5, 0), z_dir=(-0.3535533906, 0.6123724357, -0.7071067812)), keep=Keep.TOP)

    split(bisect_by=Plane(origin=(-4.88125, 8.4545730044, 9.7625), x_dir=(-0.8660254038, -0.5, 0), z_dir=(-0.3535533906, 0.6123724357, 0.7071067812)), keep=Keep.TOP)


with BuildPart() as f1_21:
    add(f1_20.part)

    # F3_t13: union F3_tool14
    add(f3_tool14.part)


with BuildPart() as f3_tool20:
    # F3_s21 → F3_t22 (new body)
    with BuildSketch(Plane.XY.offset(-5.7168783649)):
        with BuildLine():
            ThreePointArc((-16.05, 6.3508529611), (-14.2198729811, 8.18097998), (-13.55, 10.68097998))
            Line((-13.55, 10.68097998), (-13.55, 7.7942286341))
            Line((-13.55, 7.7942286341), (-16.05, 6.3508529611))
        make_face()
    extrude(amount=F3_T22_DEPTH)

    split(bisect_by=Plane(origin=(-3.00625, 5.2069777403, -6.0125), x_dir=(0.8660254038, 0.5, 0), z_dir=(0.3535533906, -0.6123724357, 0.7071067812)), keep=Keep.TOP)

    split(bisect_by=Plane(origin=(-4.88125, 8.4545730044, 9.7625), x_dir=(0.8660254038, 0.5, 0), z_dir=(0.3535533906, -0.6123724357, -0.7071067812)), keep=Keep.TOP)


with BuildPart() as f1_22:
    add(f1_21.part)

    # F3_t19: union F3_tool20
    add(f3_tool20.part)


with BuildPart() as f3_tool26:
    # F3_s27 → F3_t28 (new body)
    with BuildSketch(Plane.XY.offset(-5.7168783649)):
        with BuildLine():
            ThreePointArc((13.55, 10.68097998), (14.2198729811, 8.18097998), (16.05, 6.3508529611))
            Line((16.05, 6.3508529611), (13.55, 7.7942286341))
            Line((13.55, 7.7942286341), (13.55, 10.68097998))
        make_face()
    extrude(amount=F3_T28_DEPTH)

    split(bisect_by=Plane(origin=(4.88125, 8.4545730044, 9.7625), x_dir=(0.8660254038, -0.5, 0), z_dir=(-0.3535533906, -0.6123724357, -0.7071067812)), keep=Keep.TOP)

    split(bisect_by=Plane(origin=(3.00625, 5.2069777403, -6.0125), x_dir=(0.8660254038, -0.5, 0), z_dir=(-0.3535533906, -0.6123724357, 0.7071067812)), keep=Keep.TOP)


with BuildPart() as f1_23:
    add(f1_22.part)

    # F3_t25: union F3_tool26
    add(f3_tool26.part)


with BuildPart() as f3_tool32:
    # F3_s33 → F3_t34 (new body)
    with BuildSketch(Plane.XY.offset(-5.7168783649)):
        with BuildLine():
            ThreePointArc((13.55, 10.68097998), (14.2198729811, 8.18097998), (16.05, 6.3508529611))
            Line((16.05, 6.3508529611), (13.55, 7.7942286341))
            Line((13.55, 7.7942286341), (13.55, 10.68097998))
        make_face()
    extrude(amount=F3_T34_DEPTH)

    split(bisect_by=Plane(origin=(9.775, 0, 9.775), x_dir=(0, 1, 0), z_dir=(-0.7071067812, 0, -0.7071067812)), keep=Keep.TOP)

    split(bisect_by=Plane(origin=(6.025, 0, -6.025), x_dir=(0, 1, 0), z_dir=(-0.7071067812, 0, 0.7071067812)), keep=Keep.TOP)


with BuildPart() as f1_24:
    add(f1_23.part)

    # F3_t31: union F3_tool32
    add(f3_tool32.part)


with BuildPart() as f3_tool38:
    # F3_s39 → F3_t40 (new body)
    with BuildSketch(Plane.XY.offset(-5.7168783649)):
        with BuildLine():
            ThreePointArc((-2.5, -17.1184354815), (0, -16.4485625004), (2.5, -17.1184354815))
            Line((2.5, -17.1184354815), (0, -15.6750598085))
            Line((0, -15.6750598085), (-2.5, -17.1184354815))
        make_face()
    extrude(amount=F3_T40_DEPTH)

    split(bisect_by=Plane(origin=(-3.01875, -5.2286283753, -6.0375), x_dir=(-0.8660254038, 0.5, 0), z_dir=(0.3535533906, 0.6123724357, 0.7071067812)), keep=Keep.TOP)

    split(bisect_by=Plane(origin=(4.89375, -8.4762236395, 9.7875), x_dir=(-0.8660254038, -0.5, 0), z_dir=(-0.3535533906, 0.6123724357, -0.7071067812)), keep=Keep.TOP)


with BuildPart() as f1_25:
    add(f1_24.part)

    # F3_t37: union F3_tool38
    add(f3_tool38.part)


with BuildPart() as f3_tool44:
    # F3_s45 → F3_t46 (new body)
    with BuildSketch(Plane.XY.offset(-5.7168783649)):
        with BuildLine():
            ThreePointArc((-2.5, -17.1184354815), (0, -16.4485625004), (2.5, -17.1184354815))
            Line((2.5, -17.1184354815), (0, -15.6750598085))
            Line((0, -15.6750598085), (-2.5, -17.1184354815))
        make_face()
    extrude(amount=F3_T46_DEPTH)

    split(bisect_by=Plane(origin=(-4.89375, -8.4762236395, 9.7875), x_dir=(-0.8660254038, 0.5, 0), z_dir=(0.3535533906, 0.6123724357, -0.7071067812)), keep=Keep.TOP)

    split(bisect_by=Plane(origin=(3.01875, -5.2286283753, -6.0375), x_dir=(-0.8660254038, -0.5, 0), z_dir=(-0.3535533906, 0.6123724357, 0.7071067812)), keep=Keep.TOP)


with BuildPart() as f1_26:
    add(f1_25.part)

    # F3_t43: union F3_tool44
    add(f3_tool44.part)


with BuildPart() as f3_tool50:
    # F3_s51 → F3_t52 (new body)
    with BuildSketch(Plane.XY.offset(-5.7168783649)):
        with BuildLine():
            ThreePointArc((-2.5, -17.1184354815), (0, -16.4485625004), (2.5, -17.1184354815))
            Line((2.5, -17.1184354815), (0, -15.6750598085))
            Line((0, -15.6750598085), (-2.5, -17.1184354815))
        make_face()
    extrude(amount=F3_T52_DEPTH)

    split(bisect_by=Plane(origin=(4.89375, -8.4762236395, 9.7875), x_dir=(0.8660254038, 0.5, 0), z_dir=(0.3535533906, -0.6123724357, 0.7071067812)), keep=Keep.TOP)

    split(bisect_by=Plane(origin=(3.01875, -5.2286283753, -6.0375), x_dir=(0.8660254038, 0.5, 0), z_dir=(0.3535533906, -0.6123724357, -0.7071067812)), keep=Keep.TOP)


with BuildPart() as f1_27:
    add(f1_26.part)

    # F3_t49: union F3_tool50
    add(f3_tool50.part)


with BuildPart() as f3_tool56:
    # F3_s57 → F3_t58 (new body)
    with BuildSketch(Plane.XY.offset(-5.7168783649)):
        with BuildLine():
            ThreePointArc((-2.5, -17.1184354815), (0, -16.4485625004), (2.5, -17.1184354815))
            Line((2.5, -17.1184354815), (0, -15.6750598085))
            Line((0, -15.6750598085), (-2.5, -17.1184354815))
        make_face()
    extrude(amount=F3_T58_DEPTH)

    split(bisect_by=Plane(origin=(4.89375, -8.4762236395, 9.7875), x_dir=(-0.8660254038, -0.5, 0), z_dir=(-0.3535533906, 0.6123724357, -0.7071067812)), keep=Keep.TOP)

    split(bisect_by=Plane(origin=(3.01875, -5.2286283753, -6.0375), x_dir=(-0.8660254038, -0.5, 0), z_dir=(-0.3535533906, 0.6123724357, 0.7071067812)), keep=Keep.TOP)


with BuildPart() as f1_28:
    add(f1_27.part)

    # F3_t55: union F3_tool56
    add(f3_tool56.part)


solid = f1_28.part
